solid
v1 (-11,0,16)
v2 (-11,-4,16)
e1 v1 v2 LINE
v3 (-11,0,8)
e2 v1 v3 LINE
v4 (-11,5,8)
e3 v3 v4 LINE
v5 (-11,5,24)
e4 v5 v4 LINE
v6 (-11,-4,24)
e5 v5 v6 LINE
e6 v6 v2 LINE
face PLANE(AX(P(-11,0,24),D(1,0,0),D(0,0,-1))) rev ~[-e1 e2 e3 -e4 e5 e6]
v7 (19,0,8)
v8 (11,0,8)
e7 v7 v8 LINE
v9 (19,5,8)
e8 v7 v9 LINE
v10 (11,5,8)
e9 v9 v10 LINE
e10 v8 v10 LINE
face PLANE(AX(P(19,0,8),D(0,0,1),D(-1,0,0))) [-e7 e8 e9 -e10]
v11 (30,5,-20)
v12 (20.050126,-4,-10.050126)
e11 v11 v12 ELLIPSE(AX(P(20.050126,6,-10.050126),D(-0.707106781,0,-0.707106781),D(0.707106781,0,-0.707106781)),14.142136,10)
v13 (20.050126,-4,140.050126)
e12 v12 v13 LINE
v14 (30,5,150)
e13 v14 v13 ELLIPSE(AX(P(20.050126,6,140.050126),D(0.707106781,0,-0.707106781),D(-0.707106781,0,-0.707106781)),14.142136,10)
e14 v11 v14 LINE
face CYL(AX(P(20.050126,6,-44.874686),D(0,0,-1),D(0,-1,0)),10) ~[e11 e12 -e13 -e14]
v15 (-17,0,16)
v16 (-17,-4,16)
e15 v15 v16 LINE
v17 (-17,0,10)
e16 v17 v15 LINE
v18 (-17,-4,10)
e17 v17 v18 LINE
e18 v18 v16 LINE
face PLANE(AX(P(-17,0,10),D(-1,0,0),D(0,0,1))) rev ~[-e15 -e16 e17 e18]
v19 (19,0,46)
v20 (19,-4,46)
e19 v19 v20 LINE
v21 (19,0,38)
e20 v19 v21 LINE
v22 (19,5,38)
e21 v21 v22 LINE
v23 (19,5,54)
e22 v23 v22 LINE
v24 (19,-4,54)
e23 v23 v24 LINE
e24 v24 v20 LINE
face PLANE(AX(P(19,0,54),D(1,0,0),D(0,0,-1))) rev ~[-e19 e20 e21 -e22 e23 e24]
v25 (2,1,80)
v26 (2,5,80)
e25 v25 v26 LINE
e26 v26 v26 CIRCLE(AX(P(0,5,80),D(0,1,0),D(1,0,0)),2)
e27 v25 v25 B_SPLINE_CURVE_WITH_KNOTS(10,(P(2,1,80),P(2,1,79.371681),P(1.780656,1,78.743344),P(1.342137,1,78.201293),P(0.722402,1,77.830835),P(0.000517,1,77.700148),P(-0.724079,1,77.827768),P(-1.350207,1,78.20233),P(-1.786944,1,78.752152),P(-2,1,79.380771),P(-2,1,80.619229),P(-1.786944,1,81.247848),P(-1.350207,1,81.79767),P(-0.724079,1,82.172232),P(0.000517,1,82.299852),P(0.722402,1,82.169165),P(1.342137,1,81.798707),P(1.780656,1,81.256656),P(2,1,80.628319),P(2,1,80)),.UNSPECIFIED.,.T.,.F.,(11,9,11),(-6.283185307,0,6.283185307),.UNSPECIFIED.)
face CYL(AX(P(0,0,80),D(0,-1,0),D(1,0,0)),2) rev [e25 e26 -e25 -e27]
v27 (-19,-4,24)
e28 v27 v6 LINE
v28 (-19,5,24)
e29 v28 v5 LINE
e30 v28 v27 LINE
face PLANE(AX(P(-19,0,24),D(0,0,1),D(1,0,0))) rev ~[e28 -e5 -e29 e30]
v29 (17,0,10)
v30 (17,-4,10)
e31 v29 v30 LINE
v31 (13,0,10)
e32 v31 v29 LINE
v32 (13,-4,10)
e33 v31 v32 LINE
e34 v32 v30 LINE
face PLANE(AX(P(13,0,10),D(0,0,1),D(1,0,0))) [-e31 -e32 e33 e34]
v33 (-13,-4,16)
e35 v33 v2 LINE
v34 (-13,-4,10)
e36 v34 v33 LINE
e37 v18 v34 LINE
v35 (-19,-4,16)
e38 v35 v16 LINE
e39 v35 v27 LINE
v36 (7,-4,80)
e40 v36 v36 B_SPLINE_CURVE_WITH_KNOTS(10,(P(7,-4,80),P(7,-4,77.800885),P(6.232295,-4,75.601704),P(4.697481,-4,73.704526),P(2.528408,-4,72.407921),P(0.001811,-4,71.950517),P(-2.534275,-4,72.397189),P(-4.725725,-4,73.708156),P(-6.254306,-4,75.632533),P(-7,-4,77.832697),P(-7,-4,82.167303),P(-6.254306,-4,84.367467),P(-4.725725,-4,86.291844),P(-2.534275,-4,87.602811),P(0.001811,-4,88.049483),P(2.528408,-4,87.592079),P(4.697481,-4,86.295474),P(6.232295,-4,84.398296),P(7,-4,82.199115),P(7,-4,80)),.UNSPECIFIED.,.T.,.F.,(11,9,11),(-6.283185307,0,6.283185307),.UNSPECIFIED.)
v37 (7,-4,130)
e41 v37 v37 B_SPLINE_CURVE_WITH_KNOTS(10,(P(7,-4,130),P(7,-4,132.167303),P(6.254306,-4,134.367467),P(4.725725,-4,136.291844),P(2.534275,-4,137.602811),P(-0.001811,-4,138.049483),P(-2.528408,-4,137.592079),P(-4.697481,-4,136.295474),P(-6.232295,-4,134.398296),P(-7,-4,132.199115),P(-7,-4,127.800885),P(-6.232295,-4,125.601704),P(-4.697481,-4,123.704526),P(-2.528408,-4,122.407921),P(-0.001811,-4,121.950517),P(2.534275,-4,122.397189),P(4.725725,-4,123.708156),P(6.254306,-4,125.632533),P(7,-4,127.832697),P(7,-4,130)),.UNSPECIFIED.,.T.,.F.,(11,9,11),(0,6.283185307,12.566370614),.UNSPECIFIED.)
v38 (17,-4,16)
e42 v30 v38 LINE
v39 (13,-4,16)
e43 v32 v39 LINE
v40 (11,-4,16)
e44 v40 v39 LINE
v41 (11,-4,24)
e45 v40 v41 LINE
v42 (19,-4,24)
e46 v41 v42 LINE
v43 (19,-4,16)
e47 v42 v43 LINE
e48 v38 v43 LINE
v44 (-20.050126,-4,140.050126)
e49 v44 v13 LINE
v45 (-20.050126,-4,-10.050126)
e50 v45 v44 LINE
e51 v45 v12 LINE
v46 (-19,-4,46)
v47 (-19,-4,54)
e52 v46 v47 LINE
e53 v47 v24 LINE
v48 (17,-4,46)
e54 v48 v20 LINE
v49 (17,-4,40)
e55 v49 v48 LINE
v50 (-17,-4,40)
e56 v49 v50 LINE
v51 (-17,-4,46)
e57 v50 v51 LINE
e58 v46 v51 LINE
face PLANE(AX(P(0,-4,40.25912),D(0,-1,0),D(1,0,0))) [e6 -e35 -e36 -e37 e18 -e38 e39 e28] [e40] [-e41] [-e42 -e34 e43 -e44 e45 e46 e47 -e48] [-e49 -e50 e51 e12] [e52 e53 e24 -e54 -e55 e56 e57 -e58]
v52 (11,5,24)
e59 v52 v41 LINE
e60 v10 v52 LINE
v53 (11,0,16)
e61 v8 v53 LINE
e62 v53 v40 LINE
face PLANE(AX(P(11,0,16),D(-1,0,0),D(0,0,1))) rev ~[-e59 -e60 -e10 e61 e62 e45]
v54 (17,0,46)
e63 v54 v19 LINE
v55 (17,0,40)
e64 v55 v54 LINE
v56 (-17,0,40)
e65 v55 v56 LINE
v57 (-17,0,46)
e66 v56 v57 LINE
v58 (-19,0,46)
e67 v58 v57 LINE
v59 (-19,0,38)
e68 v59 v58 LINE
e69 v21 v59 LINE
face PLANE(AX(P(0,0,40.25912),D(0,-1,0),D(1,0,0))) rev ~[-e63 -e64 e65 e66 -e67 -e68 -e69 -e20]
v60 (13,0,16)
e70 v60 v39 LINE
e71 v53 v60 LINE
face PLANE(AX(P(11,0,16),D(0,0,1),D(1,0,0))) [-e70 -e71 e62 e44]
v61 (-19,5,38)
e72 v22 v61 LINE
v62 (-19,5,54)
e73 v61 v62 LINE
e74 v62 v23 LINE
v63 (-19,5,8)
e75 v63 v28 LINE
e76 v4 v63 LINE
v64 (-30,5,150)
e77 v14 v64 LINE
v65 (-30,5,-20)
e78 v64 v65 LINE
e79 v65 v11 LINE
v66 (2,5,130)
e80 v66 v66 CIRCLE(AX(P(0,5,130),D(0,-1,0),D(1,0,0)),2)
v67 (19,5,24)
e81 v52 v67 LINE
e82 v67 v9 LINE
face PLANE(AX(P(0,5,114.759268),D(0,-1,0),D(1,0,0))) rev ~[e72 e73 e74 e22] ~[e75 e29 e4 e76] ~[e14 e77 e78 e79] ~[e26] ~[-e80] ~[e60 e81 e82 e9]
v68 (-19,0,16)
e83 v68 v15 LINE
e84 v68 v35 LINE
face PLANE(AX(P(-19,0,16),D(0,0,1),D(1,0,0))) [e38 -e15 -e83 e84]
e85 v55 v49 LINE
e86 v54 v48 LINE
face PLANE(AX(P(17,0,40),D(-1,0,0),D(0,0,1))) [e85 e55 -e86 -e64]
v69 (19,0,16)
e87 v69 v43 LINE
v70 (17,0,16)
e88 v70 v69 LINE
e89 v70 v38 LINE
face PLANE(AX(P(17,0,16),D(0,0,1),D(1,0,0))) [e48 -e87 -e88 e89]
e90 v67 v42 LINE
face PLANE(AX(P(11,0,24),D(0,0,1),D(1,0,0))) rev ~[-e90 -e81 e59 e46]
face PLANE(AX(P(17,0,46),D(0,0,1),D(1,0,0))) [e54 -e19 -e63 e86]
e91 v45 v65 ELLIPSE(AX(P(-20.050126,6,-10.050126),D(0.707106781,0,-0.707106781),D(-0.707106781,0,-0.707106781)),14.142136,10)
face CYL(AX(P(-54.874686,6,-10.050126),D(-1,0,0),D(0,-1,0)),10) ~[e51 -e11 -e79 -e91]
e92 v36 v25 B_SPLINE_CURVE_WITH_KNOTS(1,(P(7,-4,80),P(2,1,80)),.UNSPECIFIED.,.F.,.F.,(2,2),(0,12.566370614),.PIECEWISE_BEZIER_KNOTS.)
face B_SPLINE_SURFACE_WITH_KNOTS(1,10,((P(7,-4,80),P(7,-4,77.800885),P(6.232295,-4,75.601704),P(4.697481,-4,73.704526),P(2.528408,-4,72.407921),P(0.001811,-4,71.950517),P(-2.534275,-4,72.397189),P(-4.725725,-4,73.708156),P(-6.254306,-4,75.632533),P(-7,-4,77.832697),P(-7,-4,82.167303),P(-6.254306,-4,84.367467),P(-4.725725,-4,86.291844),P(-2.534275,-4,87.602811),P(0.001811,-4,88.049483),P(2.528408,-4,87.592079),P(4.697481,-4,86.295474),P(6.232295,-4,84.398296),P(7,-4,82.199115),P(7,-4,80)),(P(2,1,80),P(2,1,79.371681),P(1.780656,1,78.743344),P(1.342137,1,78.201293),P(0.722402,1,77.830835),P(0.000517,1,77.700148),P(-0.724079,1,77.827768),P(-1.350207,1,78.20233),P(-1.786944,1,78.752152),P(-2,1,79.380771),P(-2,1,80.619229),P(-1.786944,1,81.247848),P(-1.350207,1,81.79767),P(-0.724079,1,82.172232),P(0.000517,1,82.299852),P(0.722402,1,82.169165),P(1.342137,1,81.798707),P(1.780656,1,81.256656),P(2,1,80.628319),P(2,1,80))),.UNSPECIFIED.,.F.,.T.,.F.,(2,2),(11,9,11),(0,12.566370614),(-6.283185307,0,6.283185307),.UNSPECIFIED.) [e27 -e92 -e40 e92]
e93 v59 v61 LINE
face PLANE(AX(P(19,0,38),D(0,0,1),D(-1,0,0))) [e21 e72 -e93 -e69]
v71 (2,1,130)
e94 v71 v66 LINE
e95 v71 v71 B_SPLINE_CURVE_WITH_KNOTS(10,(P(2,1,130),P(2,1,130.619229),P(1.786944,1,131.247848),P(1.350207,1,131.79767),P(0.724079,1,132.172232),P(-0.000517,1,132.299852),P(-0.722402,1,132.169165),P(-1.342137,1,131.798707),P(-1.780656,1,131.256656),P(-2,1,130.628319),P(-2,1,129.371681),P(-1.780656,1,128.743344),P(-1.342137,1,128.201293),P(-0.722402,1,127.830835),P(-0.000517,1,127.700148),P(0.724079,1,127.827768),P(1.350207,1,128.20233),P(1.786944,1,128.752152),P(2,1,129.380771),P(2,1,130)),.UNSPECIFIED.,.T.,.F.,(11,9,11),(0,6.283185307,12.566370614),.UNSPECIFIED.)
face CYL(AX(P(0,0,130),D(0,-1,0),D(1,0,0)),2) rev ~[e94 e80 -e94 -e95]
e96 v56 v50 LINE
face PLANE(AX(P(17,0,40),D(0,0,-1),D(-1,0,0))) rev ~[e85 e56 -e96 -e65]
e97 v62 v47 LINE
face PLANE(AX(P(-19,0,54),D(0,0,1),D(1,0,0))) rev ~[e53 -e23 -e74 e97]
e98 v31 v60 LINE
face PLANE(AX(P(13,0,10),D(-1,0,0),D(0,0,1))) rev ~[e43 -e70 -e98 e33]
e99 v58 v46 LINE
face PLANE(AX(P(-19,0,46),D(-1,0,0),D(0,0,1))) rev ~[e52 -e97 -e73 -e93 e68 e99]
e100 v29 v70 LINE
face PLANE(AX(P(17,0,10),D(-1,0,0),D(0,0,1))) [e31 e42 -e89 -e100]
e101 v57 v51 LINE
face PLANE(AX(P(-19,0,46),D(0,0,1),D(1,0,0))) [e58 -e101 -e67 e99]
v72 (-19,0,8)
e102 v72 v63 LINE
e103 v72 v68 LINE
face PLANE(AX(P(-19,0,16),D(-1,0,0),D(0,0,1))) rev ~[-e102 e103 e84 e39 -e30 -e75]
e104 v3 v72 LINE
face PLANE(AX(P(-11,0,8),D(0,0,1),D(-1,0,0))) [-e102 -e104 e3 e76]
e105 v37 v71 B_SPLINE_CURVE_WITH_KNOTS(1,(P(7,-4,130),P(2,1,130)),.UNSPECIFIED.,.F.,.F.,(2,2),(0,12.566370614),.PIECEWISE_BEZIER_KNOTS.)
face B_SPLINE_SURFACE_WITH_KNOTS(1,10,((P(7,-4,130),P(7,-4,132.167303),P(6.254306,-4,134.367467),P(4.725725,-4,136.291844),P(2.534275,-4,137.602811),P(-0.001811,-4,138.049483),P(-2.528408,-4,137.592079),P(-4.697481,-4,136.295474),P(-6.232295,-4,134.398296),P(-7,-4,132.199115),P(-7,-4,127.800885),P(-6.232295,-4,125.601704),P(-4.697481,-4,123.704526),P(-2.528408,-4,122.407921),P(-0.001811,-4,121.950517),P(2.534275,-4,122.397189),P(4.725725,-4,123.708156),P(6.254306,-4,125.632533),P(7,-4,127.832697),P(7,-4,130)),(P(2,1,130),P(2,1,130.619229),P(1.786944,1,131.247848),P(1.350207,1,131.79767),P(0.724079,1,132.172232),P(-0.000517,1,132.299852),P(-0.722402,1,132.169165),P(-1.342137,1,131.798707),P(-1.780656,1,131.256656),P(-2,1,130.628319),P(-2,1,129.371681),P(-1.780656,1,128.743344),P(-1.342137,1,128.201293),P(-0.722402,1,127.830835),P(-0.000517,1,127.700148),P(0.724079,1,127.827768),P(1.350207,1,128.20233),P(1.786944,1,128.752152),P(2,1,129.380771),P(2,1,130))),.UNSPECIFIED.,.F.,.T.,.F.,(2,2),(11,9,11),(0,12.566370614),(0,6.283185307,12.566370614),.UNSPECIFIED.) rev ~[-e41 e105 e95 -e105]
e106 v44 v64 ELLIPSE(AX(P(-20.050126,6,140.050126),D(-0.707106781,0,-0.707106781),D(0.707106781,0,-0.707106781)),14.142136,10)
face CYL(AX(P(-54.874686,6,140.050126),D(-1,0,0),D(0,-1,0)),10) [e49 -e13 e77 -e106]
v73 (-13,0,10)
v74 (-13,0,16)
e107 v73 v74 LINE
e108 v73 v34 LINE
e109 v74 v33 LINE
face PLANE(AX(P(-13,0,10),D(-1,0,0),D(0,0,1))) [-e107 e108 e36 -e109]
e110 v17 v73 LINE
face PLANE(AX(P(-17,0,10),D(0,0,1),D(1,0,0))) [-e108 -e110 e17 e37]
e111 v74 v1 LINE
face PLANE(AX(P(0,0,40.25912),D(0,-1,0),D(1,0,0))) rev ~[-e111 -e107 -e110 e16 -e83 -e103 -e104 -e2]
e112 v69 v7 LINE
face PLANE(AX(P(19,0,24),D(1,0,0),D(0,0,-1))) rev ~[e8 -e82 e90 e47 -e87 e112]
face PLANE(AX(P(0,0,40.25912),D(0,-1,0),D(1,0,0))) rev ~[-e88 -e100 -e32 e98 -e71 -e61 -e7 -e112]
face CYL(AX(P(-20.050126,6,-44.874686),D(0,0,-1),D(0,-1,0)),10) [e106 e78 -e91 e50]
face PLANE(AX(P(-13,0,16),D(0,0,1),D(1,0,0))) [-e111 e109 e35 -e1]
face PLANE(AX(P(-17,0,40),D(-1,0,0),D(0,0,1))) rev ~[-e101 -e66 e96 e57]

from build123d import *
from build123d import SkipClean  # not in build123d's __all__

# Parameters (mm, degrees)
F0_R        = 2
F1_DEPTH    = 5
F0_W        = 22
F0_H        = 2
F0_W_2      = 2
F0_H_2      = 6
F0_W_3      = 4
F2_DEPTH    = 4
F3_SIZE     = 5
F4_T1_DEPTH = 219.7493718553
F4_T3_DEPTH = 109.7493718553


# Not quite as in the source:
# - a fillet or chamfer that OpenCascade refuses, or shapes differently, is made with other operations: its cross-section is extruded or revolved along the edge and cut away or added
# - a feature names something its author has since deleted; it is built from what else it names


with BuildPart() as f1:
    # F0 (on Front) → F1 (new body)
    with BuildSketch(Plane.XZ):
        with BuildLine():
            Line((-30, 150), (-30, 80))
            Line((-30, 80), (-2, 80))
            ThreePointArc((-2, 80), (0, 82), (2, 80))
            Line((2, 80), (30, 80))
            Line((30, 80), (30, 150))
            Line((30, 150), (-30, 150))
        make_face()
        with Locations((0, 130)):
            Circle(F0_R, mode=Mode.SUBTRACT)
        with BuildLine():
            Line((-30, 0), (0, 0))
            Line((0, 0), (30, 0))
            Line((30, 0), (30, 80))
            Line((30, 80), (2, 80))
            ThreePointArc((2, 80), (0, 78), (-2, 80))
            Line((-2, 80), (-30, 80))
            Line((-30, 80), (-30, 0))
        make_face()
        Polygon((-11, 24), (-11, 16), (-11, 10), (-11, 8), (-13, 8), (-17, 8), (-19, 8), (-19, 10), (-19, 16), (-19, 24), align=None, mode=Mode.SUBTRACT)
        Polygon((19, 24), (19, 16), (19, 10), (19, 8), (17, 8), (13, 8), (11, 8), (11, 10), (11, 16), (11, 24), align=None, mode=Mode.SUBTRACT)
        Polygon((-19, 54), (-11, 54), (11, 54), (19, 54), (19, 46), (19, 40), (19, 38), (17, 38), (13, 38), (11, 38), (-11, 38), (-13, 38), (-17, 38), (-19, 38), (-19, 40), (-19, 46), (-19, 48), align=None, mode=Mode.SUBTRACT)
        Polygon((30, 0), (0, 0), (-30, 0), (-30, -20), (30, -20), align=None)
    extrude(amount=-F1_DEPTH)

    # F0 (on Front) → F2 (join)
    with BuildSketch(Plane.XZ):
        with BuildLine():
            Line((-30, 0), (0, 0))
            Line((0, 0), (30, 0))
            Line((30, 0), (30, 80))
            Line((30, 80), (2, 80))
            ThreePointArc((2, 80), (0, 78), (-2, 80))
            Line((-2, 80), (-30, 80))
            Line((-30, 80), (-30, 0))
        make_face()
        Polygon((-11, 24), (-11, 16), (-11, 10), (-11, 8), (-13, 8), (-17, 8), (-19, 8), (-19, 10), (-19, 16), (-19, 24), align=None, mode=Mode.SUBTRACT)
        Polygon((19, 24), (19, 16), (19, 10), (19, 8), (17, 8), (13, 8), (11, 8), (11, 10), (11, 16), (11, 24), align=None, mode=Mode.SUBTRACT)
        Polygon((-19, 54), (-11, 54), (11, 54), (19, 54), (19, 46), (19, 40), (19, 38), (17, 38), (13, 38), (11, 38), (-11, 38), (-13, 38), (-17, 38), (-19, 38), (-19, 40), (-19, 46), (-19, 48), align=None, mode=Mode.SUBTRACT)
        with BuildLine():
            Line((-30, 150), (-30, 80))
            Line((-30, 80), (-2, 80))
            ThreePointArc((-2, 80), (0, 82), (2, 80))
            Line((2, 80), (30, 80))
            Line((30, 80), (30, 150))
            Line((30, 150), (-30, 150))
        make_face()
        with Locations((0, 130)):
            Circle(F0_R, mode=Mode.SUBTRACT)
        Polygon((30, 0), (0, 0), (-30, 0), (-30, -20), (30, -20), align=None)
        with Locations((0, 39)):
            Rectangle(F0_W, F0_H)
        with Locations((-18, 43)):
            Rectangle(F0_W_2, F0_H_2)
        with Locations((18, 43)):
            Rectangle(F0_W_2, F0_H_2)
        with Locations((-18, 13)):
            Rectangle(F0_W_2, F0_H_2)
        with Locations((-12, 13)):
            Rectangle(F0_W_2, F0_H_2)
        with Locations((12, 13)):
            Rectangle(F0_W_2, F0_H_2)
        with Locations((18, 13)):
            Rectangle(F0_W_2, F0_H_2)
        with Locations((-15, 39)):
            Rectangle(F0_W_3, F0_H)
        with Locations((15, 39)):
            Rectangle(F0_W_3, F0_H)
        with Locations((-15, 9)):
            Rectangle(F0_W_3, F0_H)
        with Locations((15, 9)):
            Rectangle(F0_W_3, F0_H)
        with Locations((-18, 39)):
            Rectangle(F0_W_2, F0_H)
        with Locations((-12, 39)):
            Rectangle(F0_W_2, F0_H)
        with Locations((12, 39)):
            Rectangle(F0_W_2, F0_H)
        with Locations((18, 39)):
            Rectangle(F0_W_2, F0_H)
        with Locations((-18, 9)):
            Rectangle(F0_W_2, F0_H)
        with Locations((-12, 9)):
            Rectangle(F0_W_2, F0_H)
        with Locations((12, 9)):
            Rectangle(F0_W_2, F0_H)
        with Locations((18, 9)):
            Rectangle(F0_W_2, F0_H)
    with SkipClean():  # cleaning this boolean's faces spoils the solid; the shape is the same uncleaned
        extrude(amount=F2_DEPTH)

    # F3
    f3_edges = [f1.edges().sort_by_distance(p)[0] for p in [
        (-2, -4, 130),
        (2, -4, 80),
    ]]
    chamfer(f3_edges, length=F3_SIZE)

    # F4: fillet of radius 10 on 4 edges, made by hand

    # F4_s2 → F4_t1 (cut)
    with BuildSketch(Plane.XY.offset(-44.8746859277)):
        with BuildLine():
            ThreePointArc((-20.0501256289, -4), (-26.7583295614, -1.4161984871), (-30, 5))
            Line((-30, 5), (-30, -4))
            Line((-30, -4), (-20.0501256289, -4))
        make_face()
        with BuildLine():
            ThreePointArc((20.0501256289, -4), (26.7583295614, -1.4161984871), (30, 5))
            Line((30, 5), (30, -4))
            Line((30, -4), (20.0501256289, -4))
        make_face()
    extrude(amount=F4_T1_DEPTH, mode=Mode.SUBTRACT)

    # F4_s4 → F4_t3 (cut)
    with BuildSketch(Plane.YZ.offset(-54.8746859277)):
        with BuildLine():
            ThreePointArc((-4, 140.0501256289), (-1.4161984871, 146.7583295614), (5, 150))
            Line((5, 150), (-4, 150))
            Line((-4, 150), (-4, 140.0501256289))
        make_face()
        with BuildLine():
            ThreePointArc((-4, -10.0501256289), (-1.4161984871, -16.7583295614), (5, -20))
            Line((5, -20), (-4, -20))
            Line((-4, -20), (-4, -10.0501256289))
        make_face()
    extrude(amount=F4_T3_DEPTH, mode=Mode.SUBTRACT)


solid = f1.part
